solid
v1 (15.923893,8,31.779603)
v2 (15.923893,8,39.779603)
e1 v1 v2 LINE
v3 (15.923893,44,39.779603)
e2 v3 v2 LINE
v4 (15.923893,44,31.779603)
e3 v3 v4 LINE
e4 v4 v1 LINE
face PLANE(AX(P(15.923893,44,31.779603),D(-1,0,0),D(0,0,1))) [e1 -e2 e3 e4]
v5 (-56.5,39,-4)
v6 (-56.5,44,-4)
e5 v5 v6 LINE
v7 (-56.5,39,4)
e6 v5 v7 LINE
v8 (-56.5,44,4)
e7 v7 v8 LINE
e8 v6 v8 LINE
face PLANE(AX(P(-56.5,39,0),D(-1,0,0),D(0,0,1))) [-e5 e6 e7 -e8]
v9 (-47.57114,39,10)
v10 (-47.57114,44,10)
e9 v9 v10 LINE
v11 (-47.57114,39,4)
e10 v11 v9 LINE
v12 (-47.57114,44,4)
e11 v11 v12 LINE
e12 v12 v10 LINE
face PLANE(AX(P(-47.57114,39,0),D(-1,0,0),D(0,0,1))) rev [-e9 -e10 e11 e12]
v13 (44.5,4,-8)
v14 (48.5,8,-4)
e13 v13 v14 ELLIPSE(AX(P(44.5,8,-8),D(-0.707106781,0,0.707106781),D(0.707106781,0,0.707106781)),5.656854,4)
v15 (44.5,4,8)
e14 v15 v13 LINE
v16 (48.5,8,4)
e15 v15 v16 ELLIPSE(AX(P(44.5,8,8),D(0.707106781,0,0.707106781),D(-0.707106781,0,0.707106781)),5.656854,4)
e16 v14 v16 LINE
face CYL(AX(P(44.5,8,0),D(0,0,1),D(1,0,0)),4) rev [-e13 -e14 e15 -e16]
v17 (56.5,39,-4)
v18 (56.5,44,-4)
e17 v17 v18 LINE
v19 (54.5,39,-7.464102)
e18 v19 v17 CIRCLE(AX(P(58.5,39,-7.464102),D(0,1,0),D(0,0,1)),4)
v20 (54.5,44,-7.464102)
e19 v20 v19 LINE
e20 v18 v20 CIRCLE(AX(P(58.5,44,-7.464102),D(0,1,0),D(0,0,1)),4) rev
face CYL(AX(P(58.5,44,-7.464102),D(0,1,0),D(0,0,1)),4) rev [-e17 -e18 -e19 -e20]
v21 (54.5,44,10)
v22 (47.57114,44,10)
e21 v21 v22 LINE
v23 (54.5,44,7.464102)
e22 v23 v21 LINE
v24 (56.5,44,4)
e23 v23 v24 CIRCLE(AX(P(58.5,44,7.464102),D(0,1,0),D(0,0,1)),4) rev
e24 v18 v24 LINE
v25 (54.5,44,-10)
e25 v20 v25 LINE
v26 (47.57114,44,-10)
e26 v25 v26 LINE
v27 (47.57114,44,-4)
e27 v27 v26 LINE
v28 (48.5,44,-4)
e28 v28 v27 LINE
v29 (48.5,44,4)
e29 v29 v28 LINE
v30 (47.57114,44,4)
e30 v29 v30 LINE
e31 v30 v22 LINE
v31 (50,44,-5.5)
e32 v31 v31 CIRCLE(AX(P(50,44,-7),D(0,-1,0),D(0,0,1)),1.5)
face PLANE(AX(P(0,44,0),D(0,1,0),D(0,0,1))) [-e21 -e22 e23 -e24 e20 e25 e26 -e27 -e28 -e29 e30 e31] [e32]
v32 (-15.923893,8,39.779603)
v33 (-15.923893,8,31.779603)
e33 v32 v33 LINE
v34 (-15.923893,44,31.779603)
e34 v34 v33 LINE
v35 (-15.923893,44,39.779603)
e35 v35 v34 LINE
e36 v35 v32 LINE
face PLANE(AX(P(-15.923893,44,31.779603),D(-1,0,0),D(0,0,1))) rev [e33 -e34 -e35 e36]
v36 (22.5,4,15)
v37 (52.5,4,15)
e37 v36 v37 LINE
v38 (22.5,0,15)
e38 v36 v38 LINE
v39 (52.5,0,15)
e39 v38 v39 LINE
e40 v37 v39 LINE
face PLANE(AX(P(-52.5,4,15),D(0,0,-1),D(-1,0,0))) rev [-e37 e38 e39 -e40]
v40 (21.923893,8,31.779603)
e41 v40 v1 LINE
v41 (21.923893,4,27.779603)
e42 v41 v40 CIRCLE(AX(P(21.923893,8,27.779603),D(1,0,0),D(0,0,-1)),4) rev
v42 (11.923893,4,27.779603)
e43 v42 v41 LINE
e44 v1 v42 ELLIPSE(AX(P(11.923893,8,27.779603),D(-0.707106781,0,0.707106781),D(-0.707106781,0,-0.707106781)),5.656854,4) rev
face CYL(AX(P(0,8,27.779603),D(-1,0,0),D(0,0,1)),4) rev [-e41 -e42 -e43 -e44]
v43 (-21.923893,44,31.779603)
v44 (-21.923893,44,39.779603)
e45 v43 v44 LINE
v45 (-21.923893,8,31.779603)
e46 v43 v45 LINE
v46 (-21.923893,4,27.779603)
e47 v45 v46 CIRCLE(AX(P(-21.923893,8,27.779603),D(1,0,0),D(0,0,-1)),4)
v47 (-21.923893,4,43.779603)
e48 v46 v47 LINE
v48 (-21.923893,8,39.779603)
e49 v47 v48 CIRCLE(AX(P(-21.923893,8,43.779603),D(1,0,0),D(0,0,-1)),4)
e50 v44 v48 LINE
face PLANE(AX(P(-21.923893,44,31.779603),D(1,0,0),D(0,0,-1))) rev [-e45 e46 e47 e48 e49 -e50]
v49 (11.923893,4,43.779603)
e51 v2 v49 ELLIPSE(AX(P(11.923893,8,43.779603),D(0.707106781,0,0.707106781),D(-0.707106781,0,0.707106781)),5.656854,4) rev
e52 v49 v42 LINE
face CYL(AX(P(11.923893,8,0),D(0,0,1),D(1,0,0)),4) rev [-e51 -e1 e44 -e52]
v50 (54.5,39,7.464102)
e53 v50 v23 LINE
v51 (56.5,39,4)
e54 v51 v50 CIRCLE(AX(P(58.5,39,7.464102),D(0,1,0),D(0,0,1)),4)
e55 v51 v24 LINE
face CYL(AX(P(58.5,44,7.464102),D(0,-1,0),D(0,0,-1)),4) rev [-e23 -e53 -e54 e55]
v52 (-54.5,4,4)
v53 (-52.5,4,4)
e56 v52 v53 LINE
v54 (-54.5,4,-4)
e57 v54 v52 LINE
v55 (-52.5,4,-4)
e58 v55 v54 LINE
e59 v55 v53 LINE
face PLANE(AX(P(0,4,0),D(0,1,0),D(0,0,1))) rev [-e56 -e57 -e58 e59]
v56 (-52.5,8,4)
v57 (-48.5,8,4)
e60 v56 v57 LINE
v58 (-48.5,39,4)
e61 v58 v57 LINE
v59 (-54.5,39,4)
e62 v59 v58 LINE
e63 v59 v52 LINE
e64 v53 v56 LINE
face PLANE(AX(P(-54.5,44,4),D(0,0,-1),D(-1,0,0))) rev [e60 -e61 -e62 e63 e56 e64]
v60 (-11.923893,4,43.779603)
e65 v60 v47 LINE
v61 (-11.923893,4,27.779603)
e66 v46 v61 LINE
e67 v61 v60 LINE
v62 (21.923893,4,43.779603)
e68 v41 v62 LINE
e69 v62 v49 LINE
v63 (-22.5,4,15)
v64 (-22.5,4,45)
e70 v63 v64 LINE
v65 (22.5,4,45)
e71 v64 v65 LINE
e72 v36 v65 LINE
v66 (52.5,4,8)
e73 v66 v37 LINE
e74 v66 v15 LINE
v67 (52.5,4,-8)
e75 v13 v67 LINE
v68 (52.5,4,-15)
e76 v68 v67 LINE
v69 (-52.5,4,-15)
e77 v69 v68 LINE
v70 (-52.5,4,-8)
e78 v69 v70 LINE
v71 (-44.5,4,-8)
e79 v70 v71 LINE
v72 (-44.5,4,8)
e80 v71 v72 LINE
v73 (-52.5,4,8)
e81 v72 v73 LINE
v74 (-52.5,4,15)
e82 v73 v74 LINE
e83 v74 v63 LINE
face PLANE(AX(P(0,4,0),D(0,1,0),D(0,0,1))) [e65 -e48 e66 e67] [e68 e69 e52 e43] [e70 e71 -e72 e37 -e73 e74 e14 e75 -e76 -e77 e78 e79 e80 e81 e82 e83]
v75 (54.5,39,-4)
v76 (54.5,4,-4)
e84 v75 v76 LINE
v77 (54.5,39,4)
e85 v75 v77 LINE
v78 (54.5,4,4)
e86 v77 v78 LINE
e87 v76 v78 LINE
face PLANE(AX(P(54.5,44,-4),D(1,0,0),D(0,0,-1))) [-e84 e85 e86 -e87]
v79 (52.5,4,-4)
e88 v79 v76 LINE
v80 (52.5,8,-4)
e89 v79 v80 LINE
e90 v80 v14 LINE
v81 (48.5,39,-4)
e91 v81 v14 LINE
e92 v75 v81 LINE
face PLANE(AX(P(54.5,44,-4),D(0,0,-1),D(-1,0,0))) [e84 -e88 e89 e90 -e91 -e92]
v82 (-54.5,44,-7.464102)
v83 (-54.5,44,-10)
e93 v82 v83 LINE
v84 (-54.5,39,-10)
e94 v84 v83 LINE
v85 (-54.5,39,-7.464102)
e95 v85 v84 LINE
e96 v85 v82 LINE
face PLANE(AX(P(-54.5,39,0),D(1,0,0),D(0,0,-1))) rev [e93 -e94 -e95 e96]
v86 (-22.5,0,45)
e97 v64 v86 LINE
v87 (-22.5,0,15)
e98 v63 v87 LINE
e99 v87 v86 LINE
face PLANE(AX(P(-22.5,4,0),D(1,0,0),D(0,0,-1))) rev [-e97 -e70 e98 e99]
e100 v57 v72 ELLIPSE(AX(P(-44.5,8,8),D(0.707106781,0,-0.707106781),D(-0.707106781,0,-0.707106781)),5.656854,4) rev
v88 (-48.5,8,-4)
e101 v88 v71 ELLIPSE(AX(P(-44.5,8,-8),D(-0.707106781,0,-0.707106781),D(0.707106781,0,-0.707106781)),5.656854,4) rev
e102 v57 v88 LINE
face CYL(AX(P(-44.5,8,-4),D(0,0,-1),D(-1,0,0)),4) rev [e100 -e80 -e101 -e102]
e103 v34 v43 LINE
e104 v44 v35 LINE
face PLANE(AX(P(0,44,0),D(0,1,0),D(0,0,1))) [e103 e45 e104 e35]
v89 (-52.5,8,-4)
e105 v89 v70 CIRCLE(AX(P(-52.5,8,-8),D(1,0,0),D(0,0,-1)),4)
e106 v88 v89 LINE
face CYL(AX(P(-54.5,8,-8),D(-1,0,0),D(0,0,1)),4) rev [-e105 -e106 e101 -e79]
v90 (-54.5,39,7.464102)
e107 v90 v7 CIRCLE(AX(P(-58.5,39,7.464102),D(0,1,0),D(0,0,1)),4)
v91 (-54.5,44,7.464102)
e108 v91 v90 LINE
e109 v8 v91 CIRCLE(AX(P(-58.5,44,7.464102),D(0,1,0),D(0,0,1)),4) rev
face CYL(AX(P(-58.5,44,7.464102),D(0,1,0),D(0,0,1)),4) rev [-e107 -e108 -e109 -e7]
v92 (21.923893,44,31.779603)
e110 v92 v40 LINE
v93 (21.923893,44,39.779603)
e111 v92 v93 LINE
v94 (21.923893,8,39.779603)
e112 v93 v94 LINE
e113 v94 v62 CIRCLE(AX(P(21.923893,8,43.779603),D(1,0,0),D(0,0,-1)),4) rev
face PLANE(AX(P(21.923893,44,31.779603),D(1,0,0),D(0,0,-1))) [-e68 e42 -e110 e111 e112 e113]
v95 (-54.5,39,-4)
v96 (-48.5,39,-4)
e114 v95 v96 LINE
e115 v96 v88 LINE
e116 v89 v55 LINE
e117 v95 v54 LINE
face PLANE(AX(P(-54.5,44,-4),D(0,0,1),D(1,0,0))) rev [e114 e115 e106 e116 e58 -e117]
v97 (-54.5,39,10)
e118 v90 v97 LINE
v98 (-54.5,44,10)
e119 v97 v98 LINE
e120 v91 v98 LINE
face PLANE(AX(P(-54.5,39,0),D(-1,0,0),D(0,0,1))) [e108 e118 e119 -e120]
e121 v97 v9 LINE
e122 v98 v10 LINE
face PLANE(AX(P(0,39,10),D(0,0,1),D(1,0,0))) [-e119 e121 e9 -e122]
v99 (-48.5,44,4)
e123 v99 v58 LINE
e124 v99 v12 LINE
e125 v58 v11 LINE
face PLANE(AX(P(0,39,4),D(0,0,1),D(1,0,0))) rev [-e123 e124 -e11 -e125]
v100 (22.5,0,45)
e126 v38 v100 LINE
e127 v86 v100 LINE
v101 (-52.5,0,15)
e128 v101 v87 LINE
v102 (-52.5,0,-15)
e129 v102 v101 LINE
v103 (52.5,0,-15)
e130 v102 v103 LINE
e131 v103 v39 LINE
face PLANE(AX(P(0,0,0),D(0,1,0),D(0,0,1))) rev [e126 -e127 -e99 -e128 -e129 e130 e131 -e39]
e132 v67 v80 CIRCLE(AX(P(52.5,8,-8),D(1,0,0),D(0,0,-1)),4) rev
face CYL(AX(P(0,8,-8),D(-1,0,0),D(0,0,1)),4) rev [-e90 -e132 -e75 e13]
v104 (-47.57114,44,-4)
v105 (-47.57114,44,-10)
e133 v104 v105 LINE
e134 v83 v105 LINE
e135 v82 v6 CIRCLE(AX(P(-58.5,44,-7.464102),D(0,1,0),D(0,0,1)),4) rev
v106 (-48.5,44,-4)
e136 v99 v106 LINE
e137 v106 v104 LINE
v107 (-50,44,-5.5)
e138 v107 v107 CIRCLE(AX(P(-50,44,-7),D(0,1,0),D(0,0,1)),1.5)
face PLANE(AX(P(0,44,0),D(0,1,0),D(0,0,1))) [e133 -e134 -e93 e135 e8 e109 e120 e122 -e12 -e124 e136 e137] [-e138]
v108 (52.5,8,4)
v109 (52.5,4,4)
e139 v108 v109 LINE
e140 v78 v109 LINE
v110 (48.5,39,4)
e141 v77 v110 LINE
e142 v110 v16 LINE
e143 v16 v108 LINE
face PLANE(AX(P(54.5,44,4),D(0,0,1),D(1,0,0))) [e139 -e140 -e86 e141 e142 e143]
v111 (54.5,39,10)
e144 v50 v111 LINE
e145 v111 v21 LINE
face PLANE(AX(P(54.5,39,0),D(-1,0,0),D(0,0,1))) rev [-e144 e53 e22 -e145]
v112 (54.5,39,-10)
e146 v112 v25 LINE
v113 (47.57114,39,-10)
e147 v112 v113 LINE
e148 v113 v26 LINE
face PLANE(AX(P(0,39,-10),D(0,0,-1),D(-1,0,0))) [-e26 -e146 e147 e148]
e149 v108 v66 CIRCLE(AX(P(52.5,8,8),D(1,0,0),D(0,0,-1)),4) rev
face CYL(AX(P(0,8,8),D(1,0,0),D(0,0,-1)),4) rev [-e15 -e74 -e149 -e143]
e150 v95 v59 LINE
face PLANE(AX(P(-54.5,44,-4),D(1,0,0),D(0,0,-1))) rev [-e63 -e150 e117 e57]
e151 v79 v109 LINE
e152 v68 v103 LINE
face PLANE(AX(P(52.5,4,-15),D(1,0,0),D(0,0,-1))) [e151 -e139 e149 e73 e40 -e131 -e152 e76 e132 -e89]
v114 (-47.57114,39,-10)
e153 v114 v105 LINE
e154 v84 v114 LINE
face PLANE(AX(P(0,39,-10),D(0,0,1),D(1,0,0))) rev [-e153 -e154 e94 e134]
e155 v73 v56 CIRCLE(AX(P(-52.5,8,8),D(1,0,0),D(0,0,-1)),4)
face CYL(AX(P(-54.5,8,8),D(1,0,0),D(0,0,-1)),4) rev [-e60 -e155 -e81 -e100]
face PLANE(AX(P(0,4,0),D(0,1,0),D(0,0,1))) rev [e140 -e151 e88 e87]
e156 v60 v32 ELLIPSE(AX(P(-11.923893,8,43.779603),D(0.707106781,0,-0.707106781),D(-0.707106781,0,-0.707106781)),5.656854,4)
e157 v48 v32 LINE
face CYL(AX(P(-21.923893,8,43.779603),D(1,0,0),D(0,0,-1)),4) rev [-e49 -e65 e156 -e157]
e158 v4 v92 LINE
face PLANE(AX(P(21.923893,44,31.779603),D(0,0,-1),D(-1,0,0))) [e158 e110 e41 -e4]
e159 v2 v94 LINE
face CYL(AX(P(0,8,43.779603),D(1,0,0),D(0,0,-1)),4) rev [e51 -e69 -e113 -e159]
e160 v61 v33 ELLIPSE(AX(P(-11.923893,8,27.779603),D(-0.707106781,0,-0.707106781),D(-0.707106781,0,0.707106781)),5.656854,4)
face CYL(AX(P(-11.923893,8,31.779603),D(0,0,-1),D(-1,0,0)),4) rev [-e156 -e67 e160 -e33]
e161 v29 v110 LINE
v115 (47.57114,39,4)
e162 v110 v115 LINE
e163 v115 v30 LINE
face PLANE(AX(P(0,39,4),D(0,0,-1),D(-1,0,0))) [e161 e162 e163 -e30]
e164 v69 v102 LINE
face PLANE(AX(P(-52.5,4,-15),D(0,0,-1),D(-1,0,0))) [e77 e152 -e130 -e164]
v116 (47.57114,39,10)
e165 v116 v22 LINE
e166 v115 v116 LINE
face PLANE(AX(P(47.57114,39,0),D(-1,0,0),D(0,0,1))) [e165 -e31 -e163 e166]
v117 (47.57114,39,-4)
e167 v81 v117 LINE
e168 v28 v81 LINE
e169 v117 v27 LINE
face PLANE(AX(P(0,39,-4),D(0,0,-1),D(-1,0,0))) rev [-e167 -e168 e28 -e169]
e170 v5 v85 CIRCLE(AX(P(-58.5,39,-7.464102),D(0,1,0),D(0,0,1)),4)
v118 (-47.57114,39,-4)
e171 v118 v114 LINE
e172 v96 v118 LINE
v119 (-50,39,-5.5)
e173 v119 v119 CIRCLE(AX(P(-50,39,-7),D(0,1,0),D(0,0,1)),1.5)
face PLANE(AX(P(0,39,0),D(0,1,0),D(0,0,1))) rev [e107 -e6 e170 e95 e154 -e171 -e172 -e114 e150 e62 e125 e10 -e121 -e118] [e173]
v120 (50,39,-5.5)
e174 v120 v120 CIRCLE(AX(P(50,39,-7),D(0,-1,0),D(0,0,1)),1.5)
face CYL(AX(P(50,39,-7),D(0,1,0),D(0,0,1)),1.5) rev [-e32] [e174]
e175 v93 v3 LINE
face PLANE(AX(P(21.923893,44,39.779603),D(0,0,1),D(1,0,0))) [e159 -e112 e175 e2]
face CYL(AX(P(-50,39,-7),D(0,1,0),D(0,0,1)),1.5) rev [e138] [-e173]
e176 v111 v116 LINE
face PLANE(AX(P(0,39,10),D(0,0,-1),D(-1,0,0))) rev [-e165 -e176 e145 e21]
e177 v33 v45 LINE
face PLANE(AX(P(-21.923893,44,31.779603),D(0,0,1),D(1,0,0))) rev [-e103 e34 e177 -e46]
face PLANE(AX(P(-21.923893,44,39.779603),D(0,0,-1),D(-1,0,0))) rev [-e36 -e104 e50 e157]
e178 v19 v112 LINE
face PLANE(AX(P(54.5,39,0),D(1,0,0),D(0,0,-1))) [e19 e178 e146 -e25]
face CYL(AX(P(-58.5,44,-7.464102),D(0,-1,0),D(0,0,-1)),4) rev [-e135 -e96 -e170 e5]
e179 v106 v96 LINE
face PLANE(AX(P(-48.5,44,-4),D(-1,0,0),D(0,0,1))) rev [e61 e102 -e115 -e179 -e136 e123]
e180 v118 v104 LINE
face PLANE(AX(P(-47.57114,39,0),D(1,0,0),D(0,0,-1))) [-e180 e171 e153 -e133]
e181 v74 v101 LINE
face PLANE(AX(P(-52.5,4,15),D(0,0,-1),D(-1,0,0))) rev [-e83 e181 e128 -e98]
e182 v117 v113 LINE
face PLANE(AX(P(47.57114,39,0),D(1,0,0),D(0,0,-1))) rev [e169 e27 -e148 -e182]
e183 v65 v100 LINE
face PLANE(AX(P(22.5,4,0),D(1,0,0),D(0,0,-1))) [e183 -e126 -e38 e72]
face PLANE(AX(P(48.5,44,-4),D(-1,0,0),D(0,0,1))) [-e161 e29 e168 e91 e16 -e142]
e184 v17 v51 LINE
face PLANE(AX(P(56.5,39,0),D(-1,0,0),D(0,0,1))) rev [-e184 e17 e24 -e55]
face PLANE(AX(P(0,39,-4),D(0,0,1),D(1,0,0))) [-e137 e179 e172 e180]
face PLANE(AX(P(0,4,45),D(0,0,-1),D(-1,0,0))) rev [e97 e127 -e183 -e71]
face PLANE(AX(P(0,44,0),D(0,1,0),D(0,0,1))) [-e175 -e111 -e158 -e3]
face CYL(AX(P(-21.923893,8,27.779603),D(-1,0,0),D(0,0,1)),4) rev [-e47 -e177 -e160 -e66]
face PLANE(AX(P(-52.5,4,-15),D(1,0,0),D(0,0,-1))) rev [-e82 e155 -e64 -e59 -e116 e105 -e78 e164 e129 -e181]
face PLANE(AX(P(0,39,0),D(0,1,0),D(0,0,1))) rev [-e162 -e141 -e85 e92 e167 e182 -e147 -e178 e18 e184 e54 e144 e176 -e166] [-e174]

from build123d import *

# Parameters (mm, degrees)
SKETCH1_W            = 45
SKETCH1_H            = 30
BOSS_EXTRUDE1_DEPTH  = 4
SKETCH2_W            = 6
SKETCH2_H            = 8
BOSS_EXTRUDE2_DEPTH  = 40
SKETCH3_W            = 6.928859687
SKETCH3_H            = 6
SKETCH3_R            = 1.5
SKETCH3_W_2          = 2
SKETCH3_H_2          = 8
BOSS_EXTRUDE3_DEPTH  = 5
FILLET2_R            = 4
FILLET3_R            = 4
FILLET2_OF_MIRROR2_R = 4
FILLET3_OF_MIRROR2_R = 4


with BuildPart() as part:
    # Sketch1 → Boss-Extrude1 (new body)
    with BuildSketch(Plane(origin=(0, 0, 0), x_dir=(1, 0, 0), z_dir=(0, 1, 0))):
        Polygon((-22.5, -15), (22.5, -15), (52.5, -15), (52.5, 15), (-52.5, 15), (-52.5, -15), align=None)
        with Locations((0, -30)):
            Rectangle(SKETCH1_W, SKETCH1_H)
    extrude(amount=BOSS_EXTRUDE1_DEPTH)

    # Sketch2 → Boss-Extrude2 (add)
    with BuildSketch(Plane(origin=(0, 4, 0), x_dir=(1, 0, 0), z_dir=(0, 1, 0))):
        with Locations((-51.5, 0)):
            Rectangle(SKETCH2_W, SKETCH2_H)
        with Locations((-18.923893187, -35.779603492)):
            Rectangle(SKETCH2_W, SKETCH2_H)
    boss_extrude2 = extrude(amount=BOSS_EXTRUDE2_DEPTH)

    # Sketch3 → Boss-Extrude3 (add)
    # profile 1 of 3: a face of its own
    with BuildSketch(Plane(origin=(0, 44, 0), x_dir=(1, 0, 0), z_dir=(0, 1, 0))):
        with Locations((-51.035570157, 7)):
            Rectangle(SKETCH3_W, SKETCH3_H)
        with Locations(Location((-50, 7, 0), (0, 0, 270))):
            Circle(SKETCH3_R, mode=Mode.SUBTRACT)
    # profile 2 of 3: a face of its own
    with BuildSketch(Plane(origin=(0, 44, 0), x_dir=(1, 0, 0), z_dir=(0, 1, 0))):
        with Locations((-55.5, 0)):
            Rectangle(SKETCH3_W_2, SKETCH3_H_2)
    # profile 3 of 3: a face of its own
    with BuildSketch(Plane(origin=(0, 44, 0), x_dir=(1, 0, 0), z_dir=(0, 1, 0))):
        with Locations((-51.035570157, -7)):
            Rectangle(SKETCH3_W, SKETCH3_H)
    boss_extrude3 = extrude(amount=-BOSS_EXTRUDE3_DEPTH)

    # Fillet2
    # the kernel refuses this fillet: 4 mm, written as the material it adds along each edge
    with BuildSketch(Plane(origin=(-54.5, 39, -4), x_dir=(0, 0, -1), z_dir=(0, 1, 0))) as fillet2_piece_1:
        with BuildLine():
            CenterArc((3.464101615, 4), FILLET2_R, 210, 60)
            Line((0, 2), (-0.069282032, 1.96))
            ThreePointArc((-0.069282032, 1.96), (-0.08, 1), (-0.08, 0))
            Line((-0.08, 0), (0, -0.08))
            Line((0, -0.08), (3.464101615, -0.08))
            Line((3.464101615, -0.08), (3.464101615, 0))
        make_face()
    extrude(amount=5)
    with BuildSketch(Plane(origin=(-54.5, 39, 4), x_dir=(0, 0, 1), z_dir=(0, 1, 0))) as fillet2_piece_2:
        with BuildLine():
            CenterArc((3.464101615, -4), FILLET2_R, 90, 60)
            Line((0, -2), (-0.069282032, -1.96))
            ThreePointArc((-0.069282032, -1.96), (-0.08, -1), (-0.08, 0))
            Line((-0.08, 0), (0, 0.08))
            Line((0, 0.08), (3.464101615, 0.08))
            Line((3.464101615, 0.08), (3.464101615, 0))
        make_face()
    extrude(amount=5)

    # Fillet3
    fillet3_edges = [part.edges().sort_by_distance(p)[0] for p in [
        (-50.5, 4, 4),
        (-48.5, 4, 0),
        (-50.5, 4, -4),
        (-15.923893187, 4, 35.779603492),
        (-18.923893187, 4, 31.779603492),
        (-18.923893187, 4, 39.779603492),
    ]]
    fillet(fillet3_edges, radius=FILLET3_R)

    # Mirror2: Boss-Extrude2, Boss-Extrude3 across plane
    add(boss_extrude2.mirror(Plane(origin=(0, 0, 0), x_dir=(0, 0, 1), z_dir=(1, 0, 0))))
    add(boss_extrude3.mirror(Plane(origin=(0, 0, 0), x_dir=(0, 0, 1), z_dir=(1, 0, 0))))

    # Fillet2 of Mirror2
    # the kernel refuses this fillet: 4 mm, written as the material it adds along each edge
    with BuildSketch(Plane(origin=(54.5, 39, -4), x_dir=(0, 0, -1), z_dir=(0, 1, 0))) as fillet2_of_mirror2_piece_1:
        with BuildLine():
            CenterArc((3.464101615, -4), FILLET2_OF_MIRROR2_R, 90, 60)
            Line((0, -2), (-0.069282032, -1.96))
            ThreePointArc((-0.069282032, -1.96), (-0.08, -1), (-0.08, 0))
            Line((-0.08, 0), (0, 0.08))
            Line((0, 0.08), (3.464101615, 0.08))
            Line((3.464101615, 0.08), (3.464101615, 0))
        make_face()
    extrude(amount=5)
    with BuildSketch(Plane(origin=(54.5, 39, 4), x_dir=(0, 0, 1), z_dir=(0, 1, 0))) as fillet2_of_mirror2_piece_2:
        with BuildLine():
            CenterArc((3.464101615, 4), FILLET2_OF_MIRROR2_R, 210, 60)
            Line((0, 2), (-0.069282032, 1.96))
            ThreePointArc((-0.069282032, 1.96), (-0.08, 1), (-0.08, 0))
            Line((-0.08, 0), (0, -0.08))
            Line((0, -0.08), (3.464101615, -0.08))
            Line((3.464101615, -0.08), (3.464101615, 0))
        make_face()
    extrude(amount=5)

    # Fillet3 of Mirror2
    fillet3_of_mirror2_edges = [part.edges().sort_by_distance(p)[0] for p in [
        (50.5, 4, 4),
        (48.5, 4, 0),
        (50.5, 4, -4),
        (15.923893187, 4, 35.779603492),
        (18.923893187, 4, 31.779603492),
        (18.923893187, 4, 39.779603492),
    ]]
    fillet(fillet3_of_mirror2_edges, radius=FILLET3_OF_MIRROR2_R)


solid = part.part
